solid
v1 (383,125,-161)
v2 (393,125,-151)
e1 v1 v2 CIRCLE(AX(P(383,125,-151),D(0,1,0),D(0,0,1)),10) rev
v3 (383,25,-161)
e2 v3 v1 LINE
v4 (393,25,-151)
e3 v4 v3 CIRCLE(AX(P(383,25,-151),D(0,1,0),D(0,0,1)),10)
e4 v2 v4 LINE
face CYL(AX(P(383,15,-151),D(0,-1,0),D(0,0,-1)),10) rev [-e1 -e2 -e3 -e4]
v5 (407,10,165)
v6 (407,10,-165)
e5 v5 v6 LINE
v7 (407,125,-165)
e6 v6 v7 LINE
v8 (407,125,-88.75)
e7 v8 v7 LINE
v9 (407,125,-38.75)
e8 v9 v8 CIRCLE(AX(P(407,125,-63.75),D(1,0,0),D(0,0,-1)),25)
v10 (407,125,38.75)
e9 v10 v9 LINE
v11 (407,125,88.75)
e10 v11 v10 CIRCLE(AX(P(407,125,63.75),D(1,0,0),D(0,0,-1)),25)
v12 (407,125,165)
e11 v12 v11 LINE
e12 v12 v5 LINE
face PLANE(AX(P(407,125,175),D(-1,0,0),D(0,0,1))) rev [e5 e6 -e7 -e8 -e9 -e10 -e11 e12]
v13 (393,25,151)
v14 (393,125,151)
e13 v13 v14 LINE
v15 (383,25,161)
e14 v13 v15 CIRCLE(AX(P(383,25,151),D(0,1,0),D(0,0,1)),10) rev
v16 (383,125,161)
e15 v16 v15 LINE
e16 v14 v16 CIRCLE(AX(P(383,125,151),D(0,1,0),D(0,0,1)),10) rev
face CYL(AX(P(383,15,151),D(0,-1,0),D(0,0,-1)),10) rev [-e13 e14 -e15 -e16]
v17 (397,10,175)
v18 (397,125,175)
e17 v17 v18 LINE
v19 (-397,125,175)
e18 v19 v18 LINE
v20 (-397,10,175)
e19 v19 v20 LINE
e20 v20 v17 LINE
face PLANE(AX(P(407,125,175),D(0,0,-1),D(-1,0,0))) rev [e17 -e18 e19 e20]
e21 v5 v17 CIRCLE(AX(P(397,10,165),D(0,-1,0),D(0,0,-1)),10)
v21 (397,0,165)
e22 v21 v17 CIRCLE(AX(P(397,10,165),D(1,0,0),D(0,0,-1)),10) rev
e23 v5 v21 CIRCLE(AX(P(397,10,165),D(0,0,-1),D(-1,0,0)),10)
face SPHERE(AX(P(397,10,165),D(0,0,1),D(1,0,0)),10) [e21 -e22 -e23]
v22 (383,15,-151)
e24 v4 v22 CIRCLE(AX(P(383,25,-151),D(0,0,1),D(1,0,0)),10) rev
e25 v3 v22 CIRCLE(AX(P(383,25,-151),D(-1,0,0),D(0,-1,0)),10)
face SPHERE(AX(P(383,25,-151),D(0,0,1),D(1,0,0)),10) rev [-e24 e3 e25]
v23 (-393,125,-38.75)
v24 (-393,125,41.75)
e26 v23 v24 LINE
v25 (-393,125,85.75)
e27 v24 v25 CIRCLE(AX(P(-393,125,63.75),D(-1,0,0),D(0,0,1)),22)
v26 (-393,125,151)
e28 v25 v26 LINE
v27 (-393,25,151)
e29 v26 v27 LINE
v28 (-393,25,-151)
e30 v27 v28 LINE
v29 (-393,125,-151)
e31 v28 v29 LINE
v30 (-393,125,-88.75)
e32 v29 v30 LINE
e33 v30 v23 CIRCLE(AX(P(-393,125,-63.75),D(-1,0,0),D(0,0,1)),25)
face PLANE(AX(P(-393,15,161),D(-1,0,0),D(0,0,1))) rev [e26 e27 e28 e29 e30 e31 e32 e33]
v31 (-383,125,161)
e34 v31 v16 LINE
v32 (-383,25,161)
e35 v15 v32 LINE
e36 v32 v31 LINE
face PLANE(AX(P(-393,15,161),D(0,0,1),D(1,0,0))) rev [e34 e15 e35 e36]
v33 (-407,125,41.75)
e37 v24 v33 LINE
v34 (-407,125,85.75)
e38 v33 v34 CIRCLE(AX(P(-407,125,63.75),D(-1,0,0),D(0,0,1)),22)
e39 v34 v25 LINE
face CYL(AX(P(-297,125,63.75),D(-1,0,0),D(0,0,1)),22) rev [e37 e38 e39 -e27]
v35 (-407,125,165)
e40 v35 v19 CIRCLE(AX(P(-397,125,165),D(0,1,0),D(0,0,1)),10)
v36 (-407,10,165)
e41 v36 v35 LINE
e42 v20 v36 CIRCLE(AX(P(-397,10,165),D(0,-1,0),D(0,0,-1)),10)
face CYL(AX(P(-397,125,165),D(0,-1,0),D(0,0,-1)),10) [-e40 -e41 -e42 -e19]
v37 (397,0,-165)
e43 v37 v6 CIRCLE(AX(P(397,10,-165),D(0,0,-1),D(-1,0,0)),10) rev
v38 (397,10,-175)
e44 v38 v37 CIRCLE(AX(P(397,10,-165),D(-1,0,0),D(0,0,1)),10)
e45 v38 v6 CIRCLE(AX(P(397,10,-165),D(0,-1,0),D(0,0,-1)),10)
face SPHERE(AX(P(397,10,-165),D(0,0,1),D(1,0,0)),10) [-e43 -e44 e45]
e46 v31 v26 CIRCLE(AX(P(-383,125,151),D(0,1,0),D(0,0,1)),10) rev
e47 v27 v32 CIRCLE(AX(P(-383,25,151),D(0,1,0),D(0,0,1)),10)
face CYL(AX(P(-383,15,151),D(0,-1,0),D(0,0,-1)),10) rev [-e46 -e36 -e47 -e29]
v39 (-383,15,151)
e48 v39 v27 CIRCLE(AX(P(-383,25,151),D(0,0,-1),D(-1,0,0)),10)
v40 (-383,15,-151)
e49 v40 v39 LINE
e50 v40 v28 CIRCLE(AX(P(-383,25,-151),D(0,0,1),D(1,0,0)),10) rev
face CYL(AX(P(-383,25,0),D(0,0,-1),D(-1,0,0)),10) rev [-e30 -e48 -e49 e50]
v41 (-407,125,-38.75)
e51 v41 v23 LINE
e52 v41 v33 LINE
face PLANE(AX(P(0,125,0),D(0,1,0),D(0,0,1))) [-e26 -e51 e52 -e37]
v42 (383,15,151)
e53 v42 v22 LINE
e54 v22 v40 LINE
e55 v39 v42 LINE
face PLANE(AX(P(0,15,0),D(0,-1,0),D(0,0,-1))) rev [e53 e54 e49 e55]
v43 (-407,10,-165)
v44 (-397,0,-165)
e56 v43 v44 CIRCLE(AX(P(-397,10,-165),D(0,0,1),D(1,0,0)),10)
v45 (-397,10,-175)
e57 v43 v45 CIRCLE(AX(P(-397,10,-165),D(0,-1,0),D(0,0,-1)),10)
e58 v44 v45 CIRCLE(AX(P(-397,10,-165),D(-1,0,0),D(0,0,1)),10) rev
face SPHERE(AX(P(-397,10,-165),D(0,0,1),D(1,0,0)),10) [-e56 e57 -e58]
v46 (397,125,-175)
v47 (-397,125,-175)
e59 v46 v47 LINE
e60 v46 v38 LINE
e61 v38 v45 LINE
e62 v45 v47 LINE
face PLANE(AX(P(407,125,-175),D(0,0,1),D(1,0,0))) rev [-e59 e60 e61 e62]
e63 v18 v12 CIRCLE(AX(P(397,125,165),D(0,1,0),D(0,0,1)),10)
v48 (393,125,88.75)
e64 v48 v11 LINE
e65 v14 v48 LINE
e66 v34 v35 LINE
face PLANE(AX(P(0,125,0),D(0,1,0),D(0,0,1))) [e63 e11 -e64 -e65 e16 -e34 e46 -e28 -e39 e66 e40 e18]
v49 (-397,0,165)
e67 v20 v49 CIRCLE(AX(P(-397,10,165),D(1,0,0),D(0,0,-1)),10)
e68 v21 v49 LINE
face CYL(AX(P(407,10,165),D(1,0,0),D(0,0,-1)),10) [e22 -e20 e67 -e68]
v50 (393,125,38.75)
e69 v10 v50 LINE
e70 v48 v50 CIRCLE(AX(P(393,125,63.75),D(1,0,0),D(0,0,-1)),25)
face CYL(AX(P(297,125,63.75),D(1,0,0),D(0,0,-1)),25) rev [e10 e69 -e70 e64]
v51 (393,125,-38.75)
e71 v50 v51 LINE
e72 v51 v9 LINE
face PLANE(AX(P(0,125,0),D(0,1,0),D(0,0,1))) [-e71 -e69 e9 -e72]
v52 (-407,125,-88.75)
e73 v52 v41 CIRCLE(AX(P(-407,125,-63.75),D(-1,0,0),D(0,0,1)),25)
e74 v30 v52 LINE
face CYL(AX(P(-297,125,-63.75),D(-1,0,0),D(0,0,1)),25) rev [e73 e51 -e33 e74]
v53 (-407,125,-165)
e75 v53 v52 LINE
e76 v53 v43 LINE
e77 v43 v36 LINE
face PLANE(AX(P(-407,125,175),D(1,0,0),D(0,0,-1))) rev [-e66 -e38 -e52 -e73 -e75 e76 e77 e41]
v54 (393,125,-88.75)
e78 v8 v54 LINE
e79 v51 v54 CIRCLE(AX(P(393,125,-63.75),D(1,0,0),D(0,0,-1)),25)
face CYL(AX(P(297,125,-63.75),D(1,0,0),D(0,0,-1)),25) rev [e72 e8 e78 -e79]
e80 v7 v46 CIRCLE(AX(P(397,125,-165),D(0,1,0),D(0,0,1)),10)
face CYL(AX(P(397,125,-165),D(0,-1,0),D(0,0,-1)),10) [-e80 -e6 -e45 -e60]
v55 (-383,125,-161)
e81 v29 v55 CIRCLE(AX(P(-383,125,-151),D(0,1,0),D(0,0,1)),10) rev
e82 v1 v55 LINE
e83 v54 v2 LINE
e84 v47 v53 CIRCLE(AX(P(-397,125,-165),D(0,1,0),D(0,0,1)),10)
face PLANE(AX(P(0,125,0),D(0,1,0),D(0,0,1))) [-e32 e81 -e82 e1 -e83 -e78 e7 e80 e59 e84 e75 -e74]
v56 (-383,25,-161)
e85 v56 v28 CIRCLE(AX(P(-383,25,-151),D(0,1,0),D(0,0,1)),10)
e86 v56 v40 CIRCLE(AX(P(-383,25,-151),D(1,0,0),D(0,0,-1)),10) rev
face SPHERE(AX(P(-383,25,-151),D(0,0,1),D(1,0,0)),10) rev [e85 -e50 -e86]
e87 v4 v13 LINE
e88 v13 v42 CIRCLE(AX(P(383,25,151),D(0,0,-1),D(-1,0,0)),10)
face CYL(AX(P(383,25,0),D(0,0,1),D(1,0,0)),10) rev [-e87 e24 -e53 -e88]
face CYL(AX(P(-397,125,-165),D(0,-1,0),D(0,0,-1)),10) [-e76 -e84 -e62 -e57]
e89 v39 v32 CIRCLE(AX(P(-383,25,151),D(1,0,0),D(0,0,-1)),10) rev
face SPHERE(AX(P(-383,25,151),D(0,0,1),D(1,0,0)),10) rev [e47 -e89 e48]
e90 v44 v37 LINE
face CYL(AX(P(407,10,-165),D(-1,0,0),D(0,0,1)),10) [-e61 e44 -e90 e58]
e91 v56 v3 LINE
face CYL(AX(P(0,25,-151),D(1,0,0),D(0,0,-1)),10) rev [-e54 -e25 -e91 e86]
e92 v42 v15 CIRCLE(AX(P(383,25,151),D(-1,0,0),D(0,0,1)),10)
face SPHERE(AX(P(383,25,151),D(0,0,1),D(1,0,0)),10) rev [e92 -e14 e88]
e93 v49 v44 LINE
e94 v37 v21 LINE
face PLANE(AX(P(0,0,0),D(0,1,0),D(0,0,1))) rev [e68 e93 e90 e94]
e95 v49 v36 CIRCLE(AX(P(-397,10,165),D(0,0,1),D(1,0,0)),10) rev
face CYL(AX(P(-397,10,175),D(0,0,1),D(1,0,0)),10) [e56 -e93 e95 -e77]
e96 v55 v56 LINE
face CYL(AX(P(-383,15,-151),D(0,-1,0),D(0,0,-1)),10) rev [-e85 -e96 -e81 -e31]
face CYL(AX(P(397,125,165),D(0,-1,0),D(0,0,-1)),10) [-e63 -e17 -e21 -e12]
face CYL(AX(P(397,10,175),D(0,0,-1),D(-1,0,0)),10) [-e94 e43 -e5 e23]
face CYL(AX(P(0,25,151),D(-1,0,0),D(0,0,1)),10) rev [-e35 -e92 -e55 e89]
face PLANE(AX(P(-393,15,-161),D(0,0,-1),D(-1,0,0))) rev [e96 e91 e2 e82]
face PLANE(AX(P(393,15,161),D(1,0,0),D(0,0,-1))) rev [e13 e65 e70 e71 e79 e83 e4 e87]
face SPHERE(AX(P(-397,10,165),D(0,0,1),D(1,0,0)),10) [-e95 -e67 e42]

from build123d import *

# Parameters (mm, degrees)
SKETCH1_W           = 814
SKETCH1_H           = 350
BOSS_EXTRUDE1_DEPTH = 125
SKETCH2_W           = 786
SKETCH2_H           = 322
CUT_EXTRUDE1_DEPTH  = 110
FILLET1_R           = 10
FILLET2_R           = 10
FILLET3_R           = 10
SKETCH4_R           = 25
SKETCH4_R_2         = 22
CUT_EXTRUDE2_DEPTH  = 110
CUT_EXTRUDE3_START  = -110
SKETCH5_R           = 25
CUT_EXTRUDE3_DEPTH  = 110


with BuildPart() as part:
    # Sketch1 → Boss-Extrude1 (new body)
    with BuildSketch(Plane(origin=(0, 0, 0), x_dir=(1, 0, 0), z_dir=(0, 1, 0))):
        Rectangle(SKETCH1_W, SKETCH1_H)
    extrude(amount=BOSS_EXTRUDE1_DEPTH)

    # Sketch2 → Cut-Extrude1 (cut)
    with BuildSketch(Plane(origin=(0, 125, 0), x_dir=(1, 0, 0), z_dir=(0, 1, 0))):
        Rectangle(SKETCH2_W, SKETCH2_H)
    extrude(amount=-CUT_EXTRUDE1_DEPTH, mode=Mode.SUBTRACT)

    # Fillet1
    fillet1_edges = [part.edges().sort_by_distance(p)[0] for p in [
        (0, 0, -175),
        (407, 0, 0),
        (0, 0, 175),
        (-407, 0, 0),
    ]]
    fillet(fillet1_edges, radius=FILLET1_R)

    # Fillet2
    # the kernel refuses this fillet: 10 mm, written as the material it takes off along each edge
    with BuildSketch(Plane(origin=(397, 10, -165), x_dir=(0, 0, -1), z_dir=(1, 0, 0))) as fillet2_piece_1_section:
        Polygon((0, 0), (FILLET2_R, 0), (FILLET2_R, -FILLET2_R), (0, -FILLET2_R), align=None)
    fillet2_piece_1 = extrude(amount=FILLET2_R, mode=Mode.PRIVATE)
    fillet2_piece_1 = fillet2_piece_1 - Plane(origin=(397, 10, -165), x_dir=(0, 0.7071067811865475, 0.7071067811865475), z_dir=(1, 0, 0)) * Sphere(FILLET2_R, mode=Mode.PRIVATE)
    add(fillet2_piece_1, mode=Mode.SUBTRACT)
    with BuildSketch(Plane(origin=(397, 10, 165), x_dir=(1, 0, 0), z_dir=(0, 0, 1))) as fillet2_piece_2_section:
        Polygon((0, 0), (FILLET2_R, 0), (FILLET2_R, -FILLET2_R), (0, -FILLET2_R), align=None)
    fillet2_piece_2 = extrude(amount=FILLET2_R, mode=Mode.PRIVATE)
    fillet2_piece_2 = fillet2_piece_2 - Plane(origin=(397, 10, 165), x_dir=(-0.7071067811865475, 0.7071067811865475, 0), z_dir=(0, 0, 1)) * Sphere(FILLET2_R, mode=Mode.PRIVATE)
    add(fillet2_piece_2, mode=Mode.SUBTRACT)
    with BuildSketch(Plane(origin=(-397, 10, -165), x_dir=(0, 0, -1), z_dir=(-1, 0, 0))) as fillet2_piece_3_section:
        Polygon((0, 0), (FILLET2_R, 0), (FILLET2_R, FILLET2_R), (0, FILLET2_R), align=None)
    fillet2_piece_3 = extrude(amount=FILLET2_R, mode=Mode.PRIVATE)
    fillet2_piece_3 = fillet2_piece_3 - Plane(origin=(-397, 10, -165), x_dir=(0, 0.7071067811865475, 0.7071067811865475), z_dir=(-1, 0, 0)) * Sphere(FILLET2_R, mode=Mode.PRIVATE)
    add(fillet2_piece_3, mode=Mode.SUBTRACT)
    with BuildSketch(Plane(origin=(-397, 10, 165), x_dir=(-1, 0, 0), z_dir=(0, 0, 1))) as fillet2_piece_4_section:
        Polygon((0, 0), (FILLET2_R, 0), (FILLET2_R, FILLET2_R), (0, FILLET2_R), align=None)
    fillet2_piece_4 = extrude(amount=FILLET2_R, mode=Mode.PRIVATE)
    fillet2_piece_4 = fillet2_piece_4 - Plane(origin=(-397, 10, 165), x_dir=(0.7071067811865475, 0.7071067811865475, 0), z_dir=(0, 0, 1)) * Sphere(FILLET2_R, mode=Mode.PRIVATE)
    add(fillet2_piece_4, mode=Mode.SUBTRACT)
    with BuildSketch(Plane(origin=(-407, 10, -175), x_dir=(0, 0, 1), z_dir=(0, 1, 0)), Plane(origin=(-407, 10, 175), x_dir=(1, 0, 0), z_dir=(0, 1, 0))) as fillet2_piece_5:
        with BuildLine():
            CenterArc((FILLET2_R, FILLET2_R), FILLET2_R, 180, 90)
            Line((0, FILLET2_R), (0, 0))
            Line((0, 0), (FILLET2_R, 0))
        make_face()
    extrude(amount=140, mode=Mode.SUBTRACT)
    with BuildSketch(Plane(origin=(407, 10, -175), x_dir=(0, 0, 1), z_dir=(0, 1, 0)), Plane(origin=(407, 10, 175), x_dir=(-1, 0, 0), z_dir=(0, 1, 0))) as fillet2_piece_6:
        with BuildLine():
            CenterArc((FILLET2_R, -FILLET2_R), FILLET2_R, 90, 90)
            Line((0, -FILLET2_R), (0, 0))
            Line((0, 0), (FILLET2_R, 0))
        make_face()
    extrude(amount=140, mode=Mode.SUBTRACT)

    # Fillet3
    fillet3_edges = [part.edges().sort_by_distance(p)[0] for p in [
        (393, 15, 0),
        (393, 70, -161),
        (0, 15, 161),
        (393, 70, 161),
        (-393, 15, 0),
        (-393, 70, 161),
        (0, 15, -161),
        (-393, 70, -161),
    ]]
    fillet(fillet3_edges, radius=FILLET3_R)

    # Sketch4 → Cut-Extrude2 (cut)
    with BuildSketch(Plane.ZY.offset(407)):
        with Locations((-63.75, 125)):
            Circle(SKETCH4_R)
        with Locations((63.75, 125)):
            Circle(SKETCH4_R_2)
    extrude(amount=-CUT_EXTRUDE2_DEPTH, mode=Mode.SUBTRACT)

    # Sketch5 → Cut-Extrude3 (cut)
    with BuildSketch(Plane(origin=(407, 0, 0), x_dir=(0, 0, -1), z_dir=(1, 0, 0)).offset(CUT_EXTRUDE3_START)):
        with Locations((-63.75, 125)):
            Circle(SKETCH5_R)
        with Locations((63.75, 125)):
            Circle(SKETCH5_R)
    extrude(amount=CUT_EXTRUDE3_DEPTH, mode=Mode.SUBTRACT)


solid = part.part
